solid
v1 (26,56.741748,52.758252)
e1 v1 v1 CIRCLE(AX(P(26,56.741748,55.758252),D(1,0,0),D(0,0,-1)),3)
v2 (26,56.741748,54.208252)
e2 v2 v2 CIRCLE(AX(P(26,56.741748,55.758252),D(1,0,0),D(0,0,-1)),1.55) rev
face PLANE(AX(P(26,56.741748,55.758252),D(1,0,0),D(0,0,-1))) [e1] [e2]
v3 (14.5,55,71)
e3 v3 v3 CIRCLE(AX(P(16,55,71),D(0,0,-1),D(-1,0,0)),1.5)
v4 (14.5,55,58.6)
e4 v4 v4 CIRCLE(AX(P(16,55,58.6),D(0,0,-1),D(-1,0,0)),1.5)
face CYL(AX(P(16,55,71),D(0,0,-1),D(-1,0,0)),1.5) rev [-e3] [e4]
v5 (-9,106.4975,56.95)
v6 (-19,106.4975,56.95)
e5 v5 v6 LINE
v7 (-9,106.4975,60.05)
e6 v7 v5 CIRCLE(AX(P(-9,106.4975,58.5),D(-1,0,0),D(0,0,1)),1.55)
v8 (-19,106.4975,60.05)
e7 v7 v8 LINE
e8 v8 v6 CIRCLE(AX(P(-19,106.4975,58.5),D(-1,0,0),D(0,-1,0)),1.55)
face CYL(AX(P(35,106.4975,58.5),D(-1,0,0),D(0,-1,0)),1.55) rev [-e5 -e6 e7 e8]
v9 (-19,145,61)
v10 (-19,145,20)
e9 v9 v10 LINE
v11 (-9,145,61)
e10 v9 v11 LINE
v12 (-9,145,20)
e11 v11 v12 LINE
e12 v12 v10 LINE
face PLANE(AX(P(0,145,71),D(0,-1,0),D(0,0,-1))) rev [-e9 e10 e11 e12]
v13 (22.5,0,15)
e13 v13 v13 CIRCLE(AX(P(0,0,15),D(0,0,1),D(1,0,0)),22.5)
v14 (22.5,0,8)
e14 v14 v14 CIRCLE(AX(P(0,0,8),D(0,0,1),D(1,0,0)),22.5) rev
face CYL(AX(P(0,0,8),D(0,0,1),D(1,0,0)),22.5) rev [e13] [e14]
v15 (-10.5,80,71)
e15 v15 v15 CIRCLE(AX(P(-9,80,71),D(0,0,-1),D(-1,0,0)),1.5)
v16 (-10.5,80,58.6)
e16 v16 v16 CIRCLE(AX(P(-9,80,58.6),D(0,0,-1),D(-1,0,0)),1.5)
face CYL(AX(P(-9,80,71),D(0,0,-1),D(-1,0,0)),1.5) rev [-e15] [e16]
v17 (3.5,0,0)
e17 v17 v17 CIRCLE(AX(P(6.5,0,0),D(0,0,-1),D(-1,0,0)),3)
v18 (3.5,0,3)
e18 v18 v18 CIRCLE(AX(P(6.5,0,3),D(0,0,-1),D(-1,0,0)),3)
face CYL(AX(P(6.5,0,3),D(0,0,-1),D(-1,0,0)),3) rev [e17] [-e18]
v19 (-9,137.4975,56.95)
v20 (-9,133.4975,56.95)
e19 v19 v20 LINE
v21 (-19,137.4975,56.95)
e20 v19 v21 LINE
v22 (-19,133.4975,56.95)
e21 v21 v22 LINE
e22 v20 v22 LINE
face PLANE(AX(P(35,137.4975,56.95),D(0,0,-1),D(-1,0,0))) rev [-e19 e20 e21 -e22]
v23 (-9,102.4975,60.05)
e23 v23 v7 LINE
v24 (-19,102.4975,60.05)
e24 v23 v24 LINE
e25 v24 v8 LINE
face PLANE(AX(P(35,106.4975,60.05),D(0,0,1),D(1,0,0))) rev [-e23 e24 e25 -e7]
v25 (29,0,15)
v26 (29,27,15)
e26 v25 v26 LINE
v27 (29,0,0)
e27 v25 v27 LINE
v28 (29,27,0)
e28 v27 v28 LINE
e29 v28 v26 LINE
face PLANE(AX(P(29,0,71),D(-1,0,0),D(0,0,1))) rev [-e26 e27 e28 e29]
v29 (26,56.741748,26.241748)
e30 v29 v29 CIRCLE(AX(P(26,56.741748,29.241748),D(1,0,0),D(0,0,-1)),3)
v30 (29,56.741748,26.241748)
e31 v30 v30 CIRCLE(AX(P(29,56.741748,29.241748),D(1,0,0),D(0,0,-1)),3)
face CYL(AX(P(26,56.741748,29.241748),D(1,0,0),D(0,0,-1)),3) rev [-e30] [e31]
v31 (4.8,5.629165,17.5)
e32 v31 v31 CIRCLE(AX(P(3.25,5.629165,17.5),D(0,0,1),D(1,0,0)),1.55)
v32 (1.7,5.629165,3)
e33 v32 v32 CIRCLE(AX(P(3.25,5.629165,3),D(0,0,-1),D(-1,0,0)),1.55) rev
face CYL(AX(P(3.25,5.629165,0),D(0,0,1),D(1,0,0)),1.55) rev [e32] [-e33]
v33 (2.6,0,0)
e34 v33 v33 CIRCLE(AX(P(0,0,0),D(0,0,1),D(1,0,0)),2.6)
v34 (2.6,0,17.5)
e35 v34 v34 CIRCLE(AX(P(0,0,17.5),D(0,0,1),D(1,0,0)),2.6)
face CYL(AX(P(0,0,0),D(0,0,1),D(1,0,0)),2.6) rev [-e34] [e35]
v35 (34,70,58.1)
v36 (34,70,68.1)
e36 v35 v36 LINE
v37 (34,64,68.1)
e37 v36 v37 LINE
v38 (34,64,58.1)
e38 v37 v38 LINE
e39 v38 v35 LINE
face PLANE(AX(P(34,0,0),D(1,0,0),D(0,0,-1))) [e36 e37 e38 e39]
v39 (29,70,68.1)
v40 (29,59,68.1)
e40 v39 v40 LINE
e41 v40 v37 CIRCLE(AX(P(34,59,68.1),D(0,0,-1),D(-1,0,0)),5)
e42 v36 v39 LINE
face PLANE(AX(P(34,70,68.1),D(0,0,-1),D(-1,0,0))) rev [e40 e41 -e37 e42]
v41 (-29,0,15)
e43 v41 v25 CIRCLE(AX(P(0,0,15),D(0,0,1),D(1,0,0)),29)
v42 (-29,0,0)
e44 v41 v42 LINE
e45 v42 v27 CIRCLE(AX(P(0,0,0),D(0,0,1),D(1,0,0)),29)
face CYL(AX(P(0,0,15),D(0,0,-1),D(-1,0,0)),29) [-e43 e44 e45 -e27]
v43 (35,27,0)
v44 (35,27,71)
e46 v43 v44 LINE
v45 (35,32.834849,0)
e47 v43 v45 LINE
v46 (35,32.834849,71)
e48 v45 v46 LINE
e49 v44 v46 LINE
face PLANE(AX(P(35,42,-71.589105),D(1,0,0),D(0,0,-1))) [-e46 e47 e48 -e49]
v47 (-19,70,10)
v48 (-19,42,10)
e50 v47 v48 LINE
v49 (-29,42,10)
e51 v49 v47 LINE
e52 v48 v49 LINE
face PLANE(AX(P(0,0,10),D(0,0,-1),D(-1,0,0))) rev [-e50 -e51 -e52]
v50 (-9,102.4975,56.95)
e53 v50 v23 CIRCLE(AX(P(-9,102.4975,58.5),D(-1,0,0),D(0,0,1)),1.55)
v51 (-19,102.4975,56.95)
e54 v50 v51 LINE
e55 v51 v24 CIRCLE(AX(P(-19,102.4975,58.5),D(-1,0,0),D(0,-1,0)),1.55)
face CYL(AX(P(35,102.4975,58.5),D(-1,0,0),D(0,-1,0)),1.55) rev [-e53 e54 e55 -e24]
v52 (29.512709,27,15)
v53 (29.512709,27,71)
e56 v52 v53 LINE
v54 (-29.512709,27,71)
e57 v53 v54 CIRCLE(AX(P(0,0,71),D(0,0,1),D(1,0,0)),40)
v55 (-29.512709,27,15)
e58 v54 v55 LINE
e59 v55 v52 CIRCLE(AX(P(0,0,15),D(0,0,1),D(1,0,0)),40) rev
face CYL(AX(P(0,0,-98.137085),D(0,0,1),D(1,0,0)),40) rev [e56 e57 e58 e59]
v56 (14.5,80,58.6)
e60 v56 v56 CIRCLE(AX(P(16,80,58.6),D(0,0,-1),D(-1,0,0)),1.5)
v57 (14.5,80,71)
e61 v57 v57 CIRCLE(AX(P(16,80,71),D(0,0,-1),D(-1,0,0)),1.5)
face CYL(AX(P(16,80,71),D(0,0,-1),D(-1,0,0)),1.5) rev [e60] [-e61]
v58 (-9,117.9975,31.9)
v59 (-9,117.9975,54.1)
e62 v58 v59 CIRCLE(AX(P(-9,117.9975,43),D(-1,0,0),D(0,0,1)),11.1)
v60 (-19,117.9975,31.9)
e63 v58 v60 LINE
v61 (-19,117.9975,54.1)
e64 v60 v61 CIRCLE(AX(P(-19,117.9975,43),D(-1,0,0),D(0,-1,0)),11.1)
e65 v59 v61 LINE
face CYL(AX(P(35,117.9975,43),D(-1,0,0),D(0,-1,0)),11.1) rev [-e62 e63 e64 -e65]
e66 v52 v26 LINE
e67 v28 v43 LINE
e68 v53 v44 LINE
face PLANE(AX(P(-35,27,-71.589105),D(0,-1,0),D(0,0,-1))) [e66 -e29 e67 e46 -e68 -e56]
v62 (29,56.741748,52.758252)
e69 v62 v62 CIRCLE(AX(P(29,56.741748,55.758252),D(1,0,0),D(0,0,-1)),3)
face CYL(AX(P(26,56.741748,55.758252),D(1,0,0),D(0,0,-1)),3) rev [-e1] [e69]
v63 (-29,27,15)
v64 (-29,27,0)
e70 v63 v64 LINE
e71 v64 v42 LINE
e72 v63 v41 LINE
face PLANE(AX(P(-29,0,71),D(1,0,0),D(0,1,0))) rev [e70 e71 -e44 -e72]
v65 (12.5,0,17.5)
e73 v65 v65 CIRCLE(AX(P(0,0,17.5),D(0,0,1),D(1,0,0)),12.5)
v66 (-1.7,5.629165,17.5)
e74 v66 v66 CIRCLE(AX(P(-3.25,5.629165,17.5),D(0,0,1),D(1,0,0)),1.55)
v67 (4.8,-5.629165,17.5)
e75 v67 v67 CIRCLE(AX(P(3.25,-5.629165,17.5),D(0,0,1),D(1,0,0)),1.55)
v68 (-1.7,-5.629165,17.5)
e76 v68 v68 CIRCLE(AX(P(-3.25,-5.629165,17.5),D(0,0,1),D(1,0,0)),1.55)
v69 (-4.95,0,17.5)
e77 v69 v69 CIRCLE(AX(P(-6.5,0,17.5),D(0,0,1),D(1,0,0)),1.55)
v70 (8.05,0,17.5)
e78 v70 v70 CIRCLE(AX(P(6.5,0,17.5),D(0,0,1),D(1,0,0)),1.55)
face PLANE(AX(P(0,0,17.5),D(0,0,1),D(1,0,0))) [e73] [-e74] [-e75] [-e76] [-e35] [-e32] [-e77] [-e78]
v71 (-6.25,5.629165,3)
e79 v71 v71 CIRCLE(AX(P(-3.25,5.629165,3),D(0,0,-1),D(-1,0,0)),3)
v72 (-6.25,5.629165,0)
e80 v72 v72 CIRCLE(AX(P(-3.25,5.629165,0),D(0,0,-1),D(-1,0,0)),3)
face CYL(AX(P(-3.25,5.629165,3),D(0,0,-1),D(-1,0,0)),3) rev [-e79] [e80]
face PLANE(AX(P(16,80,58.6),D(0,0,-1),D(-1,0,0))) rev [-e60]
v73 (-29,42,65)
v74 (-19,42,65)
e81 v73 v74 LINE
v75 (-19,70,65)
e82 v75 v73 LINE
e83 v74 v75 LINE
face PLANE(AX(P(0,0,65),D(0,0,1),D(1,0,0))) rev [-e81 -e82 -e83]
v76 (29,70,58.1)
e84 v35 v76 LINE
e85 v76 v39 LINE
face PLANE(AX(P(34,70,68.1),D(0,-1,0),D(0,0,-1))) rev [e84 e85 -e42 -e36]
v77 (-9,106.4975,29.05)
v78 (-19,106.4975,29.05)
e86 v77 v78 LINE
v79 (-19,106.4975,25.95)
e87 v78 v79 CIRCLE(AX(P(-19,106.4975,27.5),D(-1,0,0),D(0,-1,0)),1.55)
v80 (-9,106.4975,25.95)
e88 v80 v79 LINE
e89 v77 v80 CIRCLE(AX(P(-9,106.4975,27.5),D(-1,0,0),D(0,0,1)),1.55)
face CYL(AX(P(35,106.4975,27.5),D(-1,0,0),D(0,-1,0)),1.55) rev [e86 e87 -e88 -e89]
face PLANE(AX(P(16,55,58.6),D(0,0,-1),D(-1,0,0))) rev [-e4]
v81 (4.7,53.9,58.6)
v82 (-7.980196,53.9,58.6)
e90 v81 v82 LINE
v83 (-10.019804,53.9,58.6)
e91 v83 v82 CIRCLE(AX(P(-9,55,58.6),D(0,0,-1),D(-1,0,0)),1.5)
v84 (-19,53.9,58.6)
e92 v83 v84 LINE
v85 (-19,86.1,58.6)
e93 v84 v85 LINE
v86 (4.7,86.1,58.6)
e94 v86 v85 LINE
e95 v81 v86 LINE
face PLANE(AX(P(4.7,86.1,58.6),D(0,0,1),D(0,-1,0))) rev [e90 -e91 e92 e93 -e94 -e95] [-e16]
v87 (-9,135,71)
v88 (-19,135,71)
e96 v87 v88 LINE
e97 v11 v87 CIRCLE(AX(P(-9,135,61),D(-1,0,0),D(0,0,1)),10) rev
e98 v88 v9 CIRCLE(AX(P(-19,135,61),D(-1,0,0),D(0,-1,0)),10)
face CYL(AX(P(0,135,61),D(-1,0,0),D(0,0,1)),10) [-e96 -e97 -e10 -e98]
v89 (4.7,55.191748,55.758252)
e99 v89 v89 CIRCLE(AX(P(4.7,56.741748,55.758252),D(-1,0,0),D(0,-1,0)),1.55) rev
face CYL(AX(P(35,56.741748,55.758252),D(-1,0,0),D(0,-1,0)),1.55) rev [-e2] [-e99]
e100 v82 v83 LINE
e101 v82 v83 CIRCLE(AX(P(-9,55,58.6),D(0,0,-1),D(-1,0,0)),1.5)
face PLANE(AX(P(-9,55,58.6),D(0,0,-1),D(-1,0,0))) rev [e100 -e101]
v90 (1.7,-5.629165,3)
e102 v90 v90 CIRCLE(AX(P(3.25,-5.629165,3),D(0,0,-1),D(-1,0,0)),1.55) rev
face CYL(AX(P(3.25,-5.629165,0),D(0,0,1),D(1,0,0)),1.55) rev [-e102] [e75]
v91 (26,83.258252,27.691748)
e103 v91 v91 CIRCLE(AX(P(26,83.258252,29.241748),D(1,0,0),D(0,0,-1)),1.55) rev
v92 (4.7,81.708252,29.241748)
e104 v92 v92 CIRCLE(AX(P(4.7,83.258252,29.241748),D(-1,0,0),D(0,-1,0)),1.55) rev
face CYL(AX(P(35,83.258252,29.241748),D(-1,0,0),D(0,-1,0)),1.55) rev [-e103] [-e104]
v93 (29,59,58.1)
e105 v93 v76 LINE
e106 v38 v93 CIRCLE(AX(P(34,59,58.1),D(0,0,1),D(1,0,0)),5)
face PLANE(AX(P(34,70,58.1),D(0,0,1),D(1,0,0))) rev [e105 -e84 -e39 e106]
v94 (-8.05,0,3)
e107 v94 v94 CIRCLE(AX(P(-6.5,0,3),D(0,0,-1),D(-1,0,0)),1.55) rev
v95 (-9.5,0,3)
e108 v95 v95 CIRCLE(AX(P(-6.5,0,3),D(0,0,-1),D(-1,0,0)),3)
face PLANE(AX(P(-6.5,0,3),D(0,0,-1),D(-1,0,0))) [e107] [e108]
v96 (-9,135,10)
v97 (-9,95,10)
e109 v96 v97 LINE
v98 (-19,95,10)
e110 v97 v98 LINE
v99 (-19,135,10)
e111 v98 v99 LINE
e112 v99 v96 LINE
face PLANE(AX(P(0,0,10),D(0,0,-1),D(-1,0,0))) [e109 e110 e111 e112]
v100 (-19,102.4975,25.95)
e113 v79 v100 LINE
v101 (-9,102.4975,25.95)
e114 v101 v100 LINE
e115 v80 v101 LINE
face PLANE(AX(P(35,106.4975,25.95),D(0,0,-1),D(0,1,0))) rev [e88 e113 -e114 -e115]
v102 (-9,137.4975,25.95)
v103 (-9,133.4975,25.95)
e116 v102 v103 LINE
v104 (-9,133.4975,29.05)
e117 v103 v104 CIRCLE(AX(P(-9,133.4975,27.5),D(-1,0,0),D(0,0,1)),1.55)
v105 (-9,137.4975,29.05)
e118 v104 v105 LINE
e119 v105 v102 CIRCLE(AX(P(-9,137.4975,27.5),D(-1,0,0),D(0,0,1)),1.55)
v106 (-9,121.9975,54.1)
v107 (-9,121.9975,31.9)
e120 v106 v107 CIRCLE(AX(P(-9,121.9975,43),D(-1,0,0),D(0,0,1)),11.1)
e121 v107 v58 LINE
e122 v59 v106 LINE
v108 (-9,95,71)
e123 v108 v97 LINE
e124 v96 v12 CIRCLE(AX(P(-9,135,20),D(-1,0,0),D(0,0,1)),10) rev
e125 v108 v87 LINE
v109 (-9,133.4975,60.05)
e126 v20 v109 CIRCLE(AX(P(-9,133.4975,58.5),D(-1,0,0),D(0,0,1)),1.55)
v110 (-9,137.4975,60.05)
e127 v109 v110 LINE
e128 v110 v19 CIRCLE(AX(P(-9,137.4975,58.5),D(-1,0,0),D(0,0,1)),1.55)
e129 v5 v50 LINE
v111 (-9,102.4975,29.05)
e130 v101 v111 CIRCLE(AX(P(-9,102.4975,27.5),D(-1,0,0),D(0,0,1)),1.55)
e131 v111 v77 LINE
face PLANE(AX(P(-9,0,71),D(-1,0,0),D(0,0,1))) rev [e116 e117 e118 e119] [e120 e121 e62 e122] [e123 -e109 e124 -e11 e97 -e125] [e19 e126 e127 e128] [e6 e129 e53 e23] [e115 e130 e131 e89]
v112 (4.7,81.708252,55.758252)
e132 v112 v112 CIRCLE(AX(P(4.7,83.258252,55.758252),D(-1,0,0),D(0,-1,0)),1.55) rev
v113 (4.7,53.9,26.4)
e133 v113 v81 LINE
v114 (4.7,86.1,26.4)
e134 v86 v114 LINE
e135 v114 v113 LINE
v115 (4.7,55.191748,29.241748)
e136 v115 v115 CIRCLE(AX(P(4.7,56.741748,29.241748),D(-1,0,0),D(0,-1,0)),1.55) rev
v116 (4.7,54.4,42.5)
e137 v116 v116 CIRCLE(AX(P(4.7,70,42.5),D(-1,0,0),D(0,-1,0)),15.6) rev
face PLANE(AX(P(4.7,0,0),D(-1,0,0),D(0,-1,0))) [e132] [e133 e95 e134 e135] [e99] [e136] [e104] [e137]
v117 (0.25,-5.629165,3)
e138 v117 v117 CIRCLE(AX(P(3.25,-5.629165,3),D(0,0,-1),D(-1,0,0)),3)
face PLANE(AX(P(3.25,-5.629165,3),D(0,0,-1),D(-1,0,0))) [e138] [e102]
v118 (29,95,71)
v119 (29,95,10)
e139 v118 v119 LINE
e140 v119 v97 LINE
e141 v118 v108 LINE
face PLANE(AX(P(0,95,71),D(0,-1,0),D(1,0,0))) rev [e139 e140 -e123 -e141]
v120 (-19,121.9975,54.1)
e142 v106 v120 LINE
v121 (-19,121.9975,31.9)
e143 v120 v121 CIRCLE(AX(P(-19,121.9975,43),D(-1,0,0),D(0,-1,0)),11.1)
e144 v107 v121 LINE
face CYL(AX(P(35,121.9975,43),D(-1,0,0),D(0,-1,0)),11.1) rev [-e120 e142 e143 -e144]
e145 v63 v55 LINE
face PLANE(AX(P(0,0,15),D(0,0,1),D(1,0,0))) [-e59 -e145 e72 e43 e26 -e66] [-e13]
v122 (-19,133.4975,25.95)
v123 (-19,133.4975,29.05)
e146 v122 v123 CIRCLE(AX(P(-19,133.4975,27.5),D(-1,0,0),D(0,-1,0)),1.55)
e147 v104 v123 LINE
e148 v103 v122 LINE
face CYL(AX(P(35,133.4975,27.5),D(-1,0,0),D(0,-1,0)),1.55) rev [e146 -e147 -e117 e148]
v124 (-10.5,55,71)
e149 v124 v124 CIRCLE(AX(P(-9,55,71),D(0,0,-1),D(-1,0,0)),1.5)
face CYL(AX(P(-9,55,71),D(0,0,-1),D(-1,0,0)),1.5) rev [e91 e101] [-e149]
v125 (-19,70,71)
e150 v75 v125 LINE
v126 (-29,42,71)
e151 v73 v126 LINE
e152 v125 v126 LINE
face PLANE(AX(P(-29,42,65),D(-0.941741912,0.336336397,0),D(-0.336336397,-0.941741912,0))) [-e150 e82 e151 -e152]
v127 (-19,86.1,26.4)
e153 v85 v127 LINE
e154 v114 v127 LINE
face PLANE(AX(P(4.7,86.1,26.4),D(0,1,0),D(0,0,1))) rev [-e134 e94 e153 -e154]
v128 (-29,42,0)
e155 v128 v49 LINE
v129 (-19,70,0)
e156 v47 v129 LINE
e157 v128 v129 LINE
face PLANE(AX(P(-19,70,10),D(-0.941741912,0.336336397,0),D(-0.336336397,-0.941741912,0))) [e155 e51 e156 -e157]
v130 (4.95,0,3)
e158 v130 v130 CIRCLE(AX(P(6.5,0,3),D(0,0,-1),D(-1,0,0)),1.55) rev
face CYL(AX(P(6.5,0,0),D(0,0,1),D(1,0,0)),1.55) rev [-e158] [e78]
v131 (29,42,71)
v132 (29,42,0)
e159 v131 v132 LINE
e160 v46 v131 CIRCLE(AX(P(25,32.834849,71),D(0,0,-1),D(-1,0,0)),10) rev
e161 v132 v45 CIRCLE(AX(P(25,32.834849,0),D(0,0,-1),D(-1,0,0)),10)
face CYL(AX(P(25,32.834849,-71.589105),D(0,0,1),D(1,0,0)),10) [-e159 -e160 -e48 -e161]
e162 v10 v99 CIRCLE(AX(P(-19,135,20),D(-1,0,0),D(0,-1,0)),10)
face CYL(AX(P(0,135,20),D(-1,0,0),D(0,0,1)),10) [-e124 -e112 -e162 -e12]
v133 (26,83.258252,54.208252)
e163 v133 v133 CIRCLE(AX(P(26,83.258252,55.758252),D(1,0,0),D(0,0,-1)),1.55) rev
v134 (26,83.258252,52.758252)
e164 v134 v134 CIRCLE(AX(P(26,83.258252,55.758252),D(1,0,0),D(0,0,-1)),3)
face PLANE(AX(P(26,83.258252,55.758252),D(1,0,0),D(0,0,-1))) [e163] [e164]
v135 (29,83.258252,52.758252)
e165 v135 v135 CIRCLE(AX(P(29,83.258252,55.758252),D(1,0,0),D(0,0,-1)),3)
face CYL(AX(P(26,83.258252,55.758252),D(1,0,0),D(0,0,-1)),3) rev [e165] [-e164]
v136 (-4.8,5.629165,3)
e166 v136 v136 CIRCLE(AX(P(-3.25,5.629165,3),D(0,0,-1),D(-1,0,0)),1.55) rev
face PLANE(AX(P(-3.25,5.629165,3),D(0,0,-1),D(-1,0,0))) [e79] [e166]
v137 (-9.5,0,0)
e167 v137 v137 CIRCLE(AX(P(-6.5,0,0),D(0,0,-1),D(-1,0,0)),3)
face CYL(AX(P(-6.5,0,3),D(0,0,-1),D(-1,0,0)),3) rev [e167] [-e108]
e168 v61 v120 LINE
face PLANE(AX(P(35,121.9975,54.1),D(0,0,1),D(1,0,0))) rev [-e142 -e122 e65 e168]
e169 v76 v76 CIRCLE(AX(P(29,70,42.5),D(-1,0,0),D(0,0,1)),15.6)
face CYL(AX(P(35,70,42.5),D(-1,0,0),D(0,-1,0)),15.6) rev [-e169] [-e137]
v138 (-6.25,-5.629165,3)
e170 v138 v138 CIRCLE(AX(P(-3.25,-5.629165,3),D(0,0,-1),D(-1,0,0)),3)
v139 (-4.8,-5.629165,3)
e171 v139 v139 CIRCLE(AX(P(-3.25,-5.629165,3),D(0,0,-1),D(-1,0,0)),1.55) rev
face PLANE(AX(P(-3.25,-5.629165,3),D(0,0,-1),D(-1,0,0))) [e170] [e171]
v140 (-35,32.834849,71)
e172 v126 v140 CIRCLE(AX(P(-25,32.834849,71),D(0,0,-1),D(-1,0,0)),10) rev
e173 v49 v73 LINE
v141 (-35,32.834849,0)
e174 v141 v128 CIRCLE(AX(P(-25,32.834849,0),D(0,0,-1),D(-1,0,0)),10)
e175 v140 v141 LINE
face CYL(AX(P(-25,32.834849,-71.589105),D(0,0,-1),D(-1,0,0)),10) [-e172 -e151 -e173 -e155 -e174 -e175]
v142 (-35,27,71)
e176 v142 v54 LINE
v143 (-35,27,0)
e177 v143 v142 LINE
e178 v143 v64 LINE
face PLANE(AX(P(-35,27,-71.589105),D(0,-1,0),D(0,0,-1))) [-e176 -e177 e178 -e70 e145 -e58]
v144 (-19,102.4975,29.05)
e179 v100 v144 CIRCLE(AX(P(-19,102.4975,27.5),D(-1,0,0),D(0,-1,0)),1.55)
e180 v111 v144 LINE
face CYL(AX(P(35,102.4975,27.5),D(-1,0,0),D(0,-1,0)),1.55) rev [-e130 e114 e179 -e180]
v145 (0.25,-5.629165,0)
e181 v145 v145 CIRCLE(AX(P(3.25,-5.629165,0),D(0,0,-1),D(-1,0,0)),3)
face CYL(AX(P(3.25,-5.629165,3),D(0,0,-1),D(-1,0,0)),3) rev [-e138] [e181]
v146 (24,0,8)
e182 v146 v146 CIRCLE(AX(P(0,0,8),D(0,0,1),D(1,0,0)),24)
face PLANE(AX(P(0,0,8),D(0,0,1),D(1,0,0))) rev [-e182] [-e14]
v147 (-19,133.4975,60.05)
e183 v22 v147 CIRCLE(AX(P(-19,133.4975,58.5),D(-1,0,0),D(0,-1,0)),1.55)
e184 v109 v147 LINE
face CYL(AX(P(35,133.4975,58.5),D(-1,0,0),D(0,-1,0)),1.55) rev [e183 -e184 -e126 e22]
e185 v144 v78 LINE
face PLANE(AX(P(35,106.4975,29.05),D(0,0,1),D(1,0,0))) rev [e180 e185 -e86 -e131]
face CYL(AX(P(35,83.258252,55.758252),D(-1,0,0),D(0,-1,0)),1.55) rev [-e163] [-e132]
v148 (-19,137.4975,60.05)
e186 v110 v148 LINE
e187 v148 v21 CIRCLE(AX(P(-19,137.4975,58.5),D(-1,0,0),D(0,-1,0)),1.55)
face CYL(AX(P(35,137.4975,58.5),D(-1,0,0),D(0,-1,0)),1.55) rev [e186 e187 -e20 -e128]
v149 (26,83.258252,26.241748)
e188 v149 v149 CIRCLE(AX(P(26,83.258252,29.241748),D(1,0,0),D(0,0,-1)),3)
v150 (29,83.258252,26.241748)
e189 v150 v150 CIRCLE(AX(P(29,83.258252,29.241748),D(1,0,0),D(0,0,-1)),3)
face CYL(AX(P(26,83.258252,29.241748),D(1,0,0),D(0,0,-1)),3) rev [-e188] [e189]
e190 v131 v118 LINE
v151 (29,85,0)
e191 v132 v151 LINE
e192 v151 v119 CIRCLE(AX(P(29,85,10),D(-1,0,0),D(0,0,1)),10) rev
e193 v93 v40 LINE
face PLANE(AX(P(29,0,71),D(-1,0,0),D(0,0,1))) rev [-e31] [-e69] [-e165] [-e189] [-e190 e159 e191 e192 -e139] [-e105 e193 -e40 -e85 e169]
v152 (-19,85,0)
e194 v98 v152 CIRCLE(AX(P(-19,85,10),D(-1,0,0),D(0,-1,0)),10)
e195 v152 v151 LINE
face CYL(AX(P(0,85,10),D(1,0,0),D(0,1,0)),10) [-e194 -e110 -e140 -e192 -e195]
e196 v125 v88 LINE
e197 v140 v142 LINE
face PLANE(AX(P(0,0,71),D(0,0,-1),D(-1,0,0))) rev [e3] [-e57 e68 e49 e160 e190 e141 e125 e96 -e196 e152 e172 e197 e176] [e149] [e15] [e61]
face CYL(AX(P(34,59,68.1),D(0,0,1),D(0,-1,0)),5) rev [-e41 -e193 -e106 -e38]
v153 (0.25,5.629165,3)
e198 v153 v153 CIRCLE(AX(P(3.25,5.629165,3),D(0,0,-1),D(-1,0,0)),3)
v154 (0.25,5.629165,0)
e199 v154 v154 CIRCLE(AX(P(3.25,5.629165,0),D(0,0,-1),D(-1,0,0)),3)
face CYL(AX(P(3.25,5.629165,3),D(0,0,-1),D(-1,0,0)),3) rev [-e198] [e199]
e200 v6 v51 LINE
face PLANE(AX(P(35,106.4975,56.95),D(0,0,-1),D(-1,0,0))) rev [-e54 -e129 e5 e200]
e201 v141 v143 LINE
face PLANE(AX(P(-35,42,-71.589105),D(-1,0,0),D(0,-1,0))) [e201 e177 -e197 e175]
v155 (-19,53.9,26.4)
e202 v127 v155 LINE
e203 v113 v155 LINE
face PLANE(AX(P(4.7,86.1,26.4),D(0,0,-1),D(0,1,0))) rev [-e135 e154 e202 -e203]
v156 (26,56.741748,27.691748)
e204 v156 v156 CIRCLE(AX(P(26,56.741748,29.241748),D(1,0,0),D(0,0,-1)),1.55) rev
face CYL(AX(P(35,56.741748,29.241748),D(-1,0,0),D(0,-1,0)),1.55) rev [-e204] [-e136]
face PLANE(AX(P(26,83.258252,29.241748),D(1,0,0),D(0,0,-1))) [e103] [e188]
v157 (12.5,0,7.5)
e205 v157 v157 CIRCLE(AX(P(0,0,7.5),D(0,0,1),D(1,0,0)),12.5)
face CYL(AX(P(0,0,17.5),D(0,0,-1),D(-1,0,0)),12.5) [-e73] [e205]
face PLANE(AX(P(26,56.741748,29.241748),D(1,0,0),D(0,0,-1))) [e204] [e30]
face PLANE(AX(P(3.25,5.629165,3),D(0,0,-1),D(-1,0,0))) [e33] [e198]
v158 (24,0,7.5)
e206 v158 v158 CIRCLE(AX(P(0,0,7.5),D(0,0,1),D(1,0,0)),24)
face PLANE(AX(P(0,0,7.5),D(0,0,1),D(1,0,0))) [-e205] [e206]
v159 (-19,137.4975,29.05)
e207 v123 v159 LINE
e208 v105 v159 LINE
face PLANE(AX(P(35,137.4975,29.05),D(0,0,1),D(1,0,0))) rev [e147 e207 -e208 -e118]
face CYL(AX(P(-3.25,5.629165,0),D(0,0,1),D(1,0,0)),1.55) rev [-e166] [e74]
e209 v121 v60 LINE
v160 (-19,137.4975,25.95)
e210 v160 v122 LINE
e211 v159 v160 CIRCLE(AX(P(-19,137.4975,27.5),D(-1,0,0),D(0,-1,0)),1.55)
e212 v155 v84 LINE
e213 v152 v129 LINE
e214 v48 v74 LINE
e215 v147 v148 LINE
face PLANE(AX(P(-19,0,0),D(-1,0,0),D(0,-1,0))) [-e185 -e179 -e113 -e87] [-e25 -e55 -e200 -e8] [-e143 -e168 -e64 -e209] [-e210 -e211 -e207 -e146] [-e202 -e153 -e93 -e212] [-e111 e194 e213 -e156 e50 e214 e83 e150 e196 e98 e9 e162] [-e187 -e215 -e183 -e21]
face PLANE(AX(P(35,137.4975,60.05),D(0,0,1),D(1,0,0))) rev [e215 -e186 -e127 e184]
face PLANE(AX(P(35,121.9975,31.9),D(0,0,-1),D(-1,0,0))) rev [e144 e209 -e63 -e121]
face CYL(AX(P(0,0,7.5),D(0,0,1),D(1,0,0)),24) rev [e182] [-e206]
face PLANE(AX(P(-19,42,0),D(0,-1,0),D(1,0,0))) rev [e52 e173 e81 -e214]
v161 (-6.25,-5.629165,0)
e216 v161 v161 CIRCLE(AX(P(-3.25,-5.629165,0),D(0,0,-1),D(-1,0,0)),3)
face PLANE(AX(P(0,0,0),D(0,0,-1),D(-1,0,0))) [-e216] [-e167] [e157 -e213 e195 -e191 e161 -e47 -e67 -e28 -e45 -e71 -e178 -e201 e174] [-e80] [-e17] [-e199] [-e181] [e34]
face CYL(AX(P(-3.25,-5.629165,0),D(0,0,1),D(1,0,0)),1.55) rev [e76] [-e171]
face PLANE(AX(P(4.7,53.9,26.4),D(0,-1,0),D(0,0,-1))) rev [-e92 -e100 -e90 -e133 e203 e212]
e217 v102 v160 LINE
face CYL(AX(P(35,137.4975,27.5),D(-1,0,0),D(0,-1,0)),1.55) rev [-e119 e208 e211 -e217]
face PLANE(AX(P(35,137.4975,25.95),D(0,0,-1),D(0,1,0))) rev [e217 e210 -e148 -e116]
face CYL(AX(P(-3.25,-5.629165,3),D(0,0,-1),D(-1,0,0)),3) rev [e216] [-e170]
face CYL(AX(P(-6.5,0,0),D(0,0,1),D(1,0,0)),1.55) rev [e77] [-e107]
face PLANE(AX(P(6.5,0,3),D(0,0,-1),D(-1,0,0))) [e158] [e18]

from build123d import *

# Parameters (mm, degrees)
SKETCH_1_R           = 29
EXTRUDE_1_DEPTH      = 15
SKETCH_2_R           = 1.55
SKETCH_2_R_2         = 2.6
CUT_EXTRUDE_1_DEPTH  = 44.669211122
EXTRUDE_2_DEPTH      = 71
SKETCH_12_W          = 70
SKETCH_12_H          = 15
EXTRUDE_3_DEPTH      = 71
FILLET_5_R           = 10
SKETCH_22_W          = 71
SKETCH_22_H          = 103
CUT_EXTRUDE_11_DEPTH = 10
SKETCH_4_R           = 40
CUT_EXTRUDE_2_DEPTH  = 56
SKETCH_5_R           = 15.6
SKETCH_5_R_2         = 1.55
CUT_EXTRUDE_3_DEPTH  = 171.241005636
SKETCH_6_W           = 32.2
SKETCH_6_H           = 32.2
CUT_EXTRUDE_4_DEPTH  = 23.7
CUT_EXTRUDE_5_DEPTH  = 171.241005636
SKETCH_8_W           = 10
SKETCH_8_H           = 50
CUT_EXTRUDE_6_DEPTH  = 10
FILLET_1_R           = 10
FILLET_2_R           = 10
FILLET_3_R           = 10
SKETCH_17_R          = 22.5
CUT_EXTRUDE_7_DEPTH  = 7
SKETCH_18_R          = 24
CUT_EXTRUDE_8_DEPTH  = 0.5
EXTRUDE_START        = 10
SKETCH_19_R          = 12.5
SKETCH_19_R_2        = 1.55
SKETCH_19_R_3        = 2.6
EXTRUDE_5_DEPTH      = 10
SKETCH_20_R          = 3
CUT_EXTRUDE_9_DEPTH  = 3
SKETCH_23_R          = 1.5
CUT_EXTRUDE_12_DEPTH = 161.262160225
SKETCH_27_R          = 3
CUT_EXTRUDE_14_DEPTH = 3
SKETCH_28_W          = 10
SKETCH_28_H          = 6
EXTRUDE_6_DEPTH      = 5
FILLET_6_R           = 5
EXTRUDE_7_DEPTH      = 10
EXTRUDE_8_DEPTH      = 6


# Some blends are built 0.0001 mm under size
with BuildPart() as part:
    # 草图1 → 凸台-拉伸1 (new body)
    with BuildSketch(Plane.XY):
        Circle(SKETCH_1_R)
    extrude(amount=EXTRUDE_1_DEPTH)

    # 草图2 → 切除-拉伸1 (cut, through all)
    with BuildSketch(Plane.XY.offset(15)):
        with Locations((-3.25, 5.629165125)):
            Circle(SKETCH_2_R)
        with Locations((3.25, 5.629165125)):
            Circle(SKETCH_2_R)
        with Locations((6.5, 0)):
            Circle(SKETCH_2_R)
        with Locations((3.25, -5.629165125)):
            Circle(SKETCH_2_R)
        Circle(SKETCH_2_R_2)
        with Locations((-3.25, -5.629165125)):
            Circle(SKETCH_2_R)
        with Locations((-6.5, 0)):
            Circle(SKETCH_2_R)
    extrude(amount=-CUT_EXTRUDE_1_DEPTH, mode=Mode.SUBTRACT)

    # 草图17 → 切除-拉伸7 (cut)
    with BuildSketch(Plane.XY.offset(15)):
        Circle(SKETCH_17_R)
    extrude(amount=-CUT_EXTRUDE_7_DEPTH, mode=Mode.SUBTRACT)

    # 草图18 → 切除-拉伸8 (cut)
    with BuildSketch(Plane.XY.offset(8)):
        Circle(SKETCH_18_R)
    extrude(amount=-CUT_EXTRUDE_8_DEPTH, mode=Mode.SUBTRACT)


with BuildPart() as body_2:
    # 草图3 → 凸台-拉伸2 (new body)
    with BuildSketch(Plane.XY):
        with BuildLine():
            ThreePointArc((-29, 0), (0, 29), (29, 0))
            Line((29, 0), (29, 95))
            Line((29, 95), (-9, 95))
            Line((-9, 95), (-9, 145))
            Line((-9, 145), (-29, 145))
            Line((-29, 145), (-29, 0))
        make_face()
    extrude(amount=EXTRUDE_2_DEPTH)

    # 草图12 → 凸台-拉伸3 (add)
    with BuildSketch(Plane.XY.offset(71)):
        with Locations((0, 34.5)):
            Rectangle(SKETCH_12_W, SKETCH_12_H)
    extrude(amount=-EXTRUDE_3_DEPTH)

    # 圆角5
    # the kernel refuses this fillet: 10 mm, written as the material it takes off along each edge
    with BuildSketch(Plane(origin=(35, 42, 93.912878475), x_dir=(0, -1, 0), z_dir=(0, 0, -1))) as fillet_5_piece_1:
        with BuildLine():
            CenterArc((9.16515139, 10), FILLET_5_R, 203.578178478, 66.421821522)
            Line((0, 6), (-0.183303028, 5.92))
            ThreePointArc((-0.183303028, 5.92), (-0.2, 3), (-0.2, 0))
            Line((-0.2, 0), (0, -0.2))
            Line((0, -0.2), (9.16515139, -0.2))
            Line((9.16515139, -0.2), (9.16515139, 0))
        make_face()
    extrude(amount=116.82575695, mode=Mode.SUBTRACT)
    with BuildSketch(Plane(origin=(-35, 42, 93.912878475), x_dir=(0, -1, 0), z_dir=(0, 0, -1))) as fillet_5_piece_2:
        with BuildLine():
            CenterArc((9.16515139, -10), FILLET_5_R, 90, 66.421821522)
            Line((0, -6), (-0.183303028, -5.92))
            ThreePointArc((-0.183303028, -5.92), (-0.2, -3), (-0.2, 0))
            Line((-0.2, 0), (0, 0.2))
            Line((0, 0.2), (9.16515139, 0.2))
            Line((9.16515139, 0.2), (9.16515139, 0))
        make_face()
    extrude(amount=116.82575695, mode=Mode.SUBTRACT)

    # 草图22 → 切除-拉伸11 (cut)
    with BuildSketch(Plane.ZY.offset(29)):
        with Locations((35.5, 93.5)):
            Rectangle(SKETCH_22_W, SKETCH_22_H)
    extrude(amount=-CUT_EXTRUDE_11_DEPTH, mode=Mode.SUBTRACT)

    # 草图4 → 切除-拉伸2 (cut)
    with BuildSketch(Plane.XY.offset(71)):
        Circle(SKETCH_4_R)
    extrude(amount=-CUT_EXTRUDE_2_DEPTH, mode=Mode.SUBTRACT)

    # 草图5 → 切除-拉伸3 (cut, through all)
    with BuildSketch(Plane.ZY.offset(19)):
        with Locations(Location((42.5, 70, 0), (0, 0, 270))):
            Circle(SKETCH_5_R)
        with Locations(Location((29.241747853, 83.258252147, 0), (0, 0, 270))):
            Circle(SKETCH_5_R_2)
        with Locations(Location((55.758252147, 83.258252147, 0), (0, 0, 270))):
            Circle(SKETCH_5_R_2)
        with Locations(Location((55.758252147, 56.741747853, 0), (0, 0, 270))):
            Circle(SKETCH_5_R_2)
        with Locations(Location((29.241747853, 56.741747853, 0), (0, 0, 270))):
            Circle(SKETCH_5_R_2)
    extrude(amount=-CUT_EXTRUDE_3_DEPTH, mode=Mode.SUBTRACT)

    # 草图6 → 切除-拉伸4 (cut)
    with BuildSketch(Plane.ZY.offset(19)):
        with Locations((42.5, 70)):
            Rectangle(SKETCH_6_W, SKETCH_6_H)
    extrude(amount=-CUT_EXTRUDE_4_DEPTH, mode=Mode.SUBTRACT)

    # 草图7 → 切除-拉伸5 (cut, through all)
    with BuildSketch(Plane.ZY.offset(19)):
        with BuildLine():
            Line((56.95, 137.497499937), (56.95, 133.497499937))
            ThreePointArc((56.95, 133.497499937), (58.5, 131.947499937), (60.05, 133.497499937))
            Line((60.05, 133.497499937), (60.05, 137.497499937))
            ThreePointArc((60.05, 137.497499937), (58.5, 139.047499937), (56.95, 137.497499937))
        make_face()
        with BuildLine():
            Line((54.1, 121.997499937), (54.1, 117.997499937))
            ThreePointArc((54.1, 117.997499937), (43, 106.897499937), (31.9, 117.997499937))
            Line((31.9, 117.997499937), (31.9, 121.997499937))
            ThreePointArc((31.9, 121.997499937), (43, 133.097499937), (54.1, 121.997499937))
        make_face()
        with BuildLine():
            Line((29.05, 137.497499937), (29.05, 133.497499937))
            ThreePointArc((29.05, 133.497499937), (27.5, 131.947499937), (25.95, 133.497499937))
            Line((25.95, 133.497499937), (25.95, 137.497499937))
            ThreePointArc((25.95, 137.497499937), (27.5, 139.047499937), (29.05, 137.497499937))
        make_face()
        with BuildLine():
            Line((56.95, 106.497499937), (56.95, 102.497499937))
            ThreePointArc((56.95, 102.497499937), (58.5, 100.947499937), (60.05, 102.497499937))
            Line((60.05, 102.497499937), (60.05, 106.497499937))
            ThreePointArc((60.05, 106.497499937), (58.5, 108.047499937), (56.95, 106.497499937))
        make_face()
        with BuildLine():
            Line((25.95, 106.497499937), (25.95, 102.497499937))
            ThreePointArc((25.95, 102.497499937), (27.5, 100.947499937), (29.05, 102.497499937))
            Line((29.05, 102.497499937), (29.05, 106.497499937))
            ThreePointArc((29.05, 106.497499937), (27.5, 108.047499937), (25.95, 106.497499937))
        make_face()
    extrude(amount=-CUT_EXTRUDE_5_DEPTH, mode=Mode.SUBTRACT)

    # 草图8 → 切除-拉伸6 (cut)
    with BuildSketch(Plane(origin=(0, 0, 0), x_dir=(-1, 0, 0), z_dir=(0, 0, -1))):
        with Locations((14, 120)):
            Rectangle(SKETCH_8_W, SKETCH_8_H)
    extrude(amount=-CUT_EXTRUDE_6_DEPTH, mode=Mode.SUBTRACT)

    # 圆角1
    fillet_1_edges = [body_2.edges().sort_by_distance(p)[0] for p in [
        (5, 95, 0),
    ]]
    fillet(fillet_1_edges, radius=FILLET_1_R)

    # 圆角2
    fillet_2_edges = [body_2.edges().sort_by_distance(p)[0] for p in [
        (-14, 145, 10),
    ]]
    fillet(fillet_2_edges, radius=FILLET_2_R)

    # 圆角3
    fillet_3_edges = [body_2.edges().sort_by_distance(p)[0] for p in [
        (-14, 145, 71),
    ]]
    fillet(fillet_3_edges, radius=FILLET_3_R)


    add(part.part)  # 凸台-拉伸5 merges part
    # 草图19 → 凸台-拉伸5 (add)
    with BuildSketch(Plane.XY.offset(7.5).offset(EXTRUDE_START)):
        Circle(SKETCH_19_R)
        with Locations((-3.25, -5.629165125)):
            Circle(SKETCH_19_R_2, mode=Mode.SUBTRACT)
        with Locations((3.25, -5.629165125)):
            Circle(SKETCH_19_R_2, mode=Mode.SUBTRACT)
        with Locations((6.5, 0)):
            Circle(SKETCH_19_R_2, mode=Mode.SUBTRACT)
        Circle(SKETCH_19_R_3, mode=Mode.SUBTRACT)
        with Locations((3.25, 5.629165125)):
            Circle(SKETCH_19_R_2, mode=Mode.SUBTRACT)
        with Locations((-3.25, 5.629165125)):
            Circle(SKETCH_19_R_2, mode=Mode.SUBTRACT)
        with Locations((-6.5, 0)):
            Circle(SKETCH_19_R_2, mode=Mode.SUBTRACT)
    extrude(amount=-EXTRUDE_5_DEPTH)

    # 草图20 → 切除-拉伸9 (cut)
    with BuildSketch(Plane(origin=(0, 0, 0), x_dir=(-1, 0, 0), z_dir=(0, 0, -1))):
        with Locations((-3.25, 5.629165125)):
            Circle(SKETCH_20_R)
        with Locations((3.25, 5.629165125)):
            Circle(SKETCH_20_R)
        with Locations((-6.5, 0)):
            Circle(SKETCH_20_R)
        with Locations((-3.25, -5.629165125)):
            Circle(SKETCH_20_R)
        with Locations((3.25, -5.629165125)):
            Circle(SKETCH_20_R)
        with Locations((6.5, 0)):
            Circle(SKETCH_20_R)
    extrude(amount=-CUT_EXTRUDE_9_DEPTH, mode=Mode.SUBTRACT)

    # 草图23 → 切除-拉伸12 (cut, through all)
    with BuildSketch(Plane(origin=(0, 0, 58.6), x_dir=(-1, 0, 0), z_dir=(0, 0, -1))):
        with Locations((-16, 80)):
            Circle(SKETCH_23_R)
        with Locations((9, 80)):
            Circle(SKETCH_23_R)
        with Locations((9, 55)):
            Circle(SKETCH_23_R)
        with Locations((-16, 55)):
            Circle(SKETCH_23_R)
    extrude(amount=-CUT_EXTRUDE_12_DEPTH, mode=Mode.SUBTRACT)

    # 草图27 → 切除-拉伸14 (cut)
    with BuildSketch(Plane(origin=(29, 0, 0), x_dir=(0, 0, -1), z_dir=(1, 0, 0))):
        with Locations((-55.758252147, 83.258252147)):
            Circle(SKETCH_27_R)
        with Locations((-29.241747853, 83.258252147)):
            Circle(SKETCH_27_R)
        with Locations((-55.758252147, 56.741747853)):
            Circle(SKETCH_27_R)
        with Locations((-29.241747853, 56.741747853)):
            Circle(SKETCH_27_R)
    extrude(amount=-CUT_EXTRUDE_14_DEPTH, mode=Mode.SUBTRACT)

    # 草图28 → 凸台-拉伸6 (add)
    with BuildSketch(Plane(origin=(29, 0, 0), x_dir=(0, 0, -1), z_dir=(1, 0, 0))):
        with Locations((-63.1, 67)):
            Rectangle(SKETCH_28_W, SKETCH_28_H)
    extrude(amount=EXTRUDE_6_DEPTH)

    # 圆角6
    fillet_6_edges = [body_2.edges().sort_by_distance(p)[0] for p in [
        (29, 64, 63.1),
    ]]
    fillet(fillet_6_edges, radius=FILLET_6_R - 0.0001)  # a hair under: the kernel refuses the full size

    # 草图29 → 凸台-拉伸7 (add)
    with BuildSketch(Plane(origin=(0, 0, 0), x_dir=(-1, 0, 0), z_dir=(0, 0, -1))):
        Polygon((19, 70), (29, 42), (19, 42), align=None)
    extrude(amount=-EXTRUDE_7_DEPTH)

    # 草图30 → 凸台-拉伸8 (add)
    with BuildSketch(Plane.XY.offset(71)):
        Polygon((-29, 42), (-19, 70), (-19, 42), align=None)
    extrude(amount=-EXTRUDE_8_DEPTH)


solid = body_2.part
